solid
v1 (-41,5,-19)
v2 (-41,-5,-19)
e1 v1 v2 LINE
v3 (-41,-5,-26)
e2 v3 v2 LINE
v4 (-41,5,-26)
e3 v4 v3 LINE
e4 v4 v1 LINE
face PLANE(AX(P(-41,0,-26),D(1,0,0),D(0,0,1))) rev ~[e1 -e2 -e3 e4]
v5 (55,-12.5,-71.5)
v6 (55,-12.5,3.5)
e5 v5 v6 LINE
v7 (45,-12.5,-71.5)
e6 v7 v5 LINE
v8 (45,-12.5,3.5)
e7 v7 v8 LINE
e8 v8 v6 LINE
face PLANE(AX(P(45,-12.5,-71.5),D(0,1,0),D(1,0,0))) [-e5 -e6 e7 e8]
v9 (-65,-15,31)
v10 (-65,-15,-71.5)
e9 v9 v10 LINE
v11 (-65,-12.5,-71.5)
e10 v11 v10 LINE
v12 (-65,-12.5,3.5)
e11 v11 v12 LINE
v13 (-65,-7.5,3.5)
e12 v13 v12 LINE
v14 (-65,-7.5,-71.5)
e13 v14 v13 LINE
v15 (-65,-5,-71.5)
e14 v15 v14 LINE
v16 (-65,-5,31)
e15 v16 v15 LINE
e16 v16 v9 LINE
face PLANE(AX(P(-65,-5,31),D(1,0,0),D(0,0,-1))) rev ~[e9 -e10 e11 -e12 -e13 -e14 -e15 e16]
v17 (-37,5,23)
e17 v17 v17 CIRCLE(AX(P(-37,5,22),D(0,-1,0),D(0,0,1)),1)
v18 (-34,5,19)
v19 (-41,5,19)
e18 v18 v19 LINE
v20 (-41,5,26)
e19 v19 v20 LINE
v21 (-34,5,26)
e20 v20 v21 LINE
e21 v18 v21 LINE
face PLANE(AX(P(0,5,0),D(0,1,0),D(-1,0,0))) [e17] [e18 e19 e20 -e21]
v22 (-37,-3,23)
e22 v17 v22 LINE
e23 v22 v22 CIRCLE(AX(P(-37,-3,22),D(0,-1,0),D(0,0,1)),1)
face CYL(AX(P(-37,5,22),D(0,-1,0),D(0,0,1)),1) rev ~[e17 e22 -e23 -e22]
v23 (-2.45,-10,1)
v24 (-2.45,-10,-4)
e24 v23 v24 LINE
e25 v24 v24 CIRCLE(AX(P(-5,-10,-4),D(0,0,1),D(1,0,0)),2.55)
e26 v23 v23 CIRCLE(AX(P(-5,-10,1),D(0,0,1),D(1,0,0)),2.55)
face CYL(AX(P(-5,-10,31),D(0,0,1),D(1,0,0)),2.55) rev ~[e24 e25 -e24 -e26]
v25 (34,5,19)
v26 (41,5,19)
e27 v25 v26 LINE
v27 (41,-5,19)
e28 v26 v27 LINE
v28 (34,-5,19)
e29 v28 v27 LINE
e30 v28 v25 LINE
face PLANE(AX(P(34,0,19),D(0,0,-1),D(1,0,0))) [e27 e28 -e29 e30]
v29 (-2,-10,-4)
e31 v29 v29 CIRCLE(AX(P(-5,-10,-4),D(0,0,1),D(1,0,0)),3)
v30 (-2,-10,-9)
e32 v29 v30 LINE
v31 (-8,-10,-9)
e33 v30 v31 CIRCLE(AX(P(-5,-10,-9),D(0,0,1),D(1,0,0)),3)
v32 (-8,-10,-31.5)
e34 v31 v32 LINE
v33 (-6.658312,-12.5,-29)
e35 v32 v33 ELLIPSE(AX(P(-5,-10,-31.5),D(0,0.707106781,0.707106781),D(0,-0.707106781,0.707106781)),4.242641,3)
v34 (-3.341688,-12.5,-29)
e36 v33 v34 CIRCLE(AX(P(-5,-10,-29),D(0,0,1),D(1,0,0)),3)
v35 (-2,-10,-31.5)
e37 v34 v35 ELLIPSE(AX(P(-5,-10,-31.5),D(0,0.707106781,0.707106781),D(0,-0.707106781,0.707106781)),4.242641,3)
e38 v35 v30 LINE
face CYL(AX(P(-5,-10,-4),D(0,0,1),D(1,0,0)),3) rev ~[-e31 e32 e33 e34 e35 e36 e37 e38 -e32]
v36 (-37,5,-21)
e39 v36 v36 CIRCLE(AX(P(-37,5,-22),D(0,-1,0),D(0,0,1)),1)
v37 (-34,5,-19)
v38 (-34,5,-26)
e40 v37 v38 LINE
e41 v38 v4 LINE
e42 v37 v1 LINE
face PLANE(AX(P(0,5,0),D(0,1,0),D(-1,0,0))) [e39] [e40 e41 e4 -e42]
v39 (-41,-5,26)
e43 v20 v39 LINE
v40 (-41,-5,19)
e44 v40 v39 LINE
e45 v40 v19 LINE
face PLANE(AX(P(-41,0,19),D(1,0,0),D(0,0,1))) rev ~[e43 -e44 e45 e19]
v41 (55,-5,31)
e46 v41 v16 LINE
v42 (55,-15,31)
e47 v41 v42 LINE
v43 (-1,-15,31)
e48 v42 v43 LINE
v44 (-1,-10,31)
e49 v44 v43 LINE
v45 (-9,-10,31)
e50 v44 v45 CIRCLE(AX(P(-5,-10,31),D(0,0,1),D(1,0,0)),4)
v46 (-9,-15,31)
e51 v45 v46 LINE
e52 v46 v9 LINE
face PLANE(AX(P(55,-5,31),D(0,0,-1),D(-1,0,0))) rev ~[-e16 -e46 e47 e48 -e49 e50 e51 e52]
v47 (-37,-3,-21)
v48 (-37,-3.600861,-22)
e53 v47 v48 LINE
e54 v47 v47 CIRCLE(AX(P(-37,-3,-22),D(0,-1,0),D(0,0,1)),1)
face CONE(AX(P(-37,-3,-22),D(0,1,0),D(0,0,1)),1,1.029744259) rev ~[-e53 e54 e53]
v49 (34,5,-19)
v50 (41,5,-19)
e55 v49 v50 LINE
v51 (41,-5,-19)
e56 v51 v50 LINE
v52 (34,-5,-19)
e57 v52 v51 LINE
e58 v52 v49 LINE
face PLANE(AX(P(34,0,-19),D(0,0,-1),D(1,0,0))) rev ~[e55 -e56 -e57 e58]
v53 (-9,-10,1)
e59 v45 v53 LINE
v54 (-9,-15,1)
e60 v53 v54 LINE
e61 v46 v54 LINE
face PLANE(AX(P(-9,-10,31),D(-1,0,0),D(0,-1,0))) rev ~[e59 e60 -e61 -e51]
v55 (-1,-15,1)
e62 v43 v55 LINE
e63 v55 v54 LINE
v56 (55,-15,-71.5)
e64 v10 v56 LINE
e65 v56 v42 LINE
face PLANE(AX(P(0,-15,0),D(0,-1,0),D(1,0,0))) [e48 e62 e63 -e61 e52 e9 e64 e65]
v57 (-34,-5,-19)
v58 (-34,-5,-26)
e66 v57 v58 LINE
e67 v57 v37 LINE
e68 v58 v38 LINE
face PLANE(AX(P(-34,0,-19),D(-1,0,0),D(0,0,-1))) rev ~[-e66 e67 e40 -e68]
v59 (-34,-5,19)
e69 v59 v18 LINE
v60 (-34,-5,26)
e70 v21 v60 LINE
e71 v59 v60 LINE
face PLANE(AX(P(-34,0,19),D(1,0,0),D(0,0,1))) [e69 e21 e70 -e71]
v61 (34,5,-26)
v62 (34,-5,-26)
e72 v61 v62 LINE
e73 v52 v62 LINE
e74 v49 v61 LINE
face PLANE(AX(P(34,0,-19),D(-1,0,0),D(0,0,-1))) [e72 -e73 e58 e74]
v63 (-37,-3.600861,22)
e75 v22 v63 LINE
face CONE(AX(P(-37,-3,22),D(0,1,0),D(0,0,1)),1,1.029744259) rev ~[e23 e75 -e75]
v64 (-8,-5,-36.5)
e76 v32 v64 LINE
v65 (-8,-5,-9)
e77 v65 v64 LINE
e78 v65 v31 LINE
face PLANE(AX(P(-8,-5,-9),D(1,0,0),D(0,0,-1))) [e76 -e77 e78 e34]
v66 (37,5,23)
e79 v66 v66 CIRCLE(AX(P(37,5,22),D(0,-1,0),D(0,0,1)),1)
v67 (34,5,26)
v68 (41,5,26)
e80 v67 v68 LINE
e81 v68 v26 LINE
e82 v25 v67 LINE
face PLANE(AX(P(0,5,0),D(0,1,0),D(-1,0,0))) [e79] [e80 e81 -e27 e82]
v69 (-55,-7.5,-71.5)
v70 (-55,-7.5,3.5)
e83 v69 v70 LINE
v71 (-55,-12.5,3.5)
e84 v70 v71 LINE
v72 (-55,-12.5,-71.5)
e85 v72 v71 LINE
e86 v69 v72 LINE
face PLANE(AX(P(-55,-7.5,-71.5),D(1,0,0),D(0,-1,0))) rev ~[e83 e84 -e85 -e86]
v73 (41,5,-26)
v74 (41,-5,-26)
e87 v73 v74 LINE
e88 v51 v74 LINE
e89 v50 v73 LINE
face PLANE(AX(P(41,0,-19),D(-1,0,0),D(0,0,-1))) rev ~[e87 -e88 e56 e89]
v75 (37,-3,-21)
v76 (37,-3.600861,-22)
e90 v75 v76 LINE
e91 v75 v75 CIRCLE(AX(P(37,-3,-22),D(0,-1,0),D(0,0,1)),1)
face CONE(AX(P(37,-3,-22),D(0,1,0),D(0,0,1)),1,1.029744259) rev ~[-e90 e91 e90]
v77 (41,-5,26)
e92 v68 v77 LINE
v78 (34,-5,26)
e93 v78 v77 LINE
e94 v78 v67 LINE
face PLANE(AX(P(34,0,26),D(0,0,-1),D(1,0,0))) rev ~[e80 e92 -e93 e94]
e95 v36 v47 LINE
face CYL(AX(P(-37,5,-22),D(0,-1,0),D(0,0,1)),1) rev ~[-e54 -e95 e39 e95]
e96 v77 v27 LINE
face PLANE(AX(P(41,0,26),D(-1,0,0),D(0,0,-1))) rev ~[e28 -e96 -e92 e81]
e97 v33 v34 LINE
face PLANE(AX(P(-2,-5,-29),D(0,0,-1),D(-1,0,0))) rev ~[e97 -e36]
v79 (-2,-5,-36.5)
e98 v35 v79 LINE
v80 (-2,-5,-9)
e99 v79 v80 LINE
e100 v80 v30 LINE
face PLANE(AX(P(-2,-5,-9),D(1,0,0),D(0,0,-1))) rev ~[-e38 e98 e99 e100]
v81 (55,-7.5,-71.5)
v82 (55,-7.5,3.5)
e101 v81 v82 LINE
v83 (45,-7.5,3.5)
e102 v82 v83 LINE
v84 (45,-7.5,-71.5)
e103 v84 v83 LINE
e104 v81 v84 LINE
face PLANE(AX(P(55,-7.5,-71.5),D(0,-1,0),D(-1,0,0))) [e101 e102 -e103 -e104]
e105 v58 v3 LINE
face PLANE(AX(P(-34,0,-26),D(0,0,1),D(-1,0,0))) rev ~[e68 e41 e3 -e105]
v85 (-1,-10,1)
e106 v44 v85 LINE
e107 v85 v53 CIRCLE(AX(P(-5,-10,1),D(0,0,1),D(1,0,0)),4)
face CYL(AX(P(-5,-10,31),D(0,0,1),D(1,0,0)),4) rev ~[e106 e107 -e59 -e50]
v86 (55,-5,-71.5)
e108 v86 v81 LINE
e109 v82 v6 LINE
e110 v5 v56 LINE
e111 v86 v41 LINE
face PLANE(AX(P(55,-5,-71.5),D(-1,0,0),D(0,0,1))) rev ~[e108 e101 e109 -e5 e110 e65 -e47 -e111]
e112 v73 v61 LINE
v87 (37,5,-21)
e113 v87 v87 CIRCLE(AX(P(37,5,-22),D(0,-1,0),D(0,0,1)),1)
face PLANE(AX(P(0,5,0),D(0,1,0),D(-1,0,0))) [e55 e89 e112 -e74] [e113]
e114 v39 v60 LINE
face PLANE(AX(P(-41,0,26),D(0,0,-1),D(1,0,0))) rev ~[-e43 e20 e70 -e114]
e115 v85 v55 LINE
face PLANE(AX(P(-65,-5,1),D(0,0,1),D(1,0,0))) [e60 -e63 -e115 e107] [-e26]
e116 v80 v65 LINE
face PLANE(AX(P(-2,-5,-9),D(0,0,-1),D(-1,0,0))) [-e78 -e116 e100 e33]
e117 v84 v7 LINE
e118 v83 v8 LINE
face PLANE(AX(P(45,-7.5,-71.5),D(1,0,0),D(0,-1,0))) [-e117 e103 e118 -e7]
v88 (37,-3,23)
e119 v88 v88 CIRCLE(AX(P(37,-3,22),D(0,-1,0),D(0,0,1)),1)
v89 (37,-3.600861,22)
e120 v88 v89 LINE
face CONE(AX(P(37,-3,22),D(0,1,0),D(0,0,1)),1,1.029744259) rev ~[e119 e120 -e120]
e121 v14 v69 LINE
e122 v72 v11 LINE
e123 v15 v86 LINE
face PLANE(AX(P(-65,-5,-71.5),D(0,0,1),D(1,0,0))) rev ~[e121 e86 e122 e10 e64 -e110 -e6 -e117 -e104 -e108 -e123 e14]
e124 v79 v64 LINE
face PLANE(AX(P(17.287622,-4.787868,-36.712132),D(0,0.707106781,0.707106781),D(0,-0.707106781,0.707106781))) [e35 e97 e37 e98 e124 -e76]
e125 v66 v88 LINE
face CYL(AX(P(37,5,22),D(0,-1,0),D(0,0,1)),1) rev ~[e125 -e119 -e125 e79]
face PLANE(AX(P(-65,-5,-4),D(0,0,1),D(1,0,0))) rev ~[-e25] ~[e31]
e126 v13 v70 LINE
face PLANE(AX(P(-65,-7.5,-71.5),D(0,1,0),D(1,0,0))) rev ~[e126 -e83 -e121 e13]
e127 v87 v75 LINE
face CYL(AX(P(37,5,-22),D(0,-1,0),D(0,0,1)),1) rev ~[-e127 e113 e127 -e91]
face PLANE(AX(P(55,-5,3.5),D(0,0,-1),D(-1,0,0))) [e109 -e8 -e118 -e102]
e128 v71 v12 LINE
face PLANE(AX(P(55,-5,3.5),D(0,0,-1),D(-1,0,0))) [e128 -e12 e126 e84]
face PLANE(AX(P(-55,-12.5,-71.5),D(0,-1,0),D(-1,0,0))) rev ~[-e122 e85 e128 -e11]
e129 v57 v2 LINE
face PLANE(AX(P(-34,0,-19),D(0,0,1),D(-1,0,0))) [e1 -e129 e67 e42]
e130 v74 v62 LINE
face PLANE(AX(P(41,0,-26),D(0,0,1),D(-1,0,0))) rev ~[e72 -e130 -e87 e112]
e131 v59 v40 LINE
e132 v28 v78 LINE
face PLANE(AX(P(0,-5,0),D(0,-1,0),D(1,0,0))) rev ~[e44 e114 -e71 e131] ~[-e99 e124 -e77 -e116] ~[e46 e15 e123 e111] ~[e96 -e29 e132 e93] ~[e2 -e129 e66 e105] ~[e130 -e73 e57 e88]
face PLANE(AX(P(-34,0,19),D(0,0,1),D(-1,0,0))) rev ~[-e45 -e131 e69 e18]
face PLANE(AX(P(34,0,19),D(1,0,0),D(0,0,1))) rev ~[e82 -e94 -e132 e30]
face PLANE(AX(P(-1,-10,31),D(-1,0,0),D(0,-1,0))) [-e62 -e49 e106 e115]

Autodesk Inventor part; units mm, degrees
ref_plane "YZ Plane" through (0, 0, 0) normal (1, 0, 0) x (0, 1, 0)
ref_plane "XZ Plane" through (0, 0, 0) normal (0, 1, 0) x (-1, 0, 0)
ref_plane "XY Plane" through (0, 0, 0) normal (0, 0, 1) x (1, 0, 0)
sketch "Sketch1" plane through (0, 0, 0) normal (0, 1, 0) x (-1, 0, 0)
  line L0 (34, 19) -> (-34, 19)
  line L1 (-34, 19) -> (-34, -19)
  line L2 (-34, -19) -> (34, -19)
  line L3 (34, -19) -> (34, 19)
  line L4 (34, 19) -> (-34, -19) construction
  line L5 (-34, 19) -> (34, -19) construction
  line L6 (41, 26) -> (-41, 26)
  line L7 (-41, 26) -> (-41, -26)
  line L8 (-41, -26) -> (41, -26)
  line L9 (41, -26) -> (41, 26)
  line L10 (41, 26) -> (-41, -26) construction
  line L11 (-41, 26) -> (41, -26) construction
  line L12 (-34, -19) -> (-41, -19)
  line L13 (-34, -19) -> (-34, -26)
  line L14 (-34, 19) -> (-41, 19)
  line L15 (-34, 19) -> (-34, 26)
  line L16 (34, -19) -> (34, -26)
  line L17 (34, -19) -> (41, -19)
  line L18 (34, 19) -> (41, 19)
  line L19 (34, 19) -> (34, 26)
  point P0 (0, 0)
  dimension "d0" = 68
  dimension "d1" = 38
  dimension "d2" = 82
  dimension "d3" = 52
extrude "Extrusion1" add sketch "Sketch1" along normal mid plane 10 contours L19 L6 L9 L18 | L14 L7 L6 L15 | L17 L9 L8 L16 | L13 L8 L7 L12
sketch "Sketch2" plane through (0, -5, 0) normal (0, -1, 0) x (1, 0, 0)
  line L0 (-65, -71.5) -> (55, -71.5)
  line L1 (55, -71.5) -> (55, 31)
  line L2 (55, 31) -> (-65, 31)
  line L3 (-65, 31) -> (-65, -71.5)
  line L4 (-34, 26) -> (-41, 26) projected
  point P0 (0, 0)
  dimension "d6" = 120
  dimension "d7" = 102.5
  dimension "d8" = 5
  dimension "d9" = 55
extrude "Extrusion2" add sketch "Sketch2" along normal blind 10
sketch "Sketch3" plane through (-65, -5, 31) normal (0, 0, 1) x (1, 0, 0)
  circle A0 centre (60, -5) radius 4
  line L0 (120, -10) -> (0, -10) projected
  line L1 (120, 0) -> (120, -10) projected
  circle A1 centre (60, -5) radius 2.55
  circle A2 centre (60, -5) radius 3
  line L2 (56, -5) -> (56, -10)
  line L3 (64, -5) -> (64, -10)
  line L4 (56, -10) -> (64, -10)
  point P0 (65, 5)
  point P1 (60, -10)
  dimension "d13" = 8
  dimension "d14" = 5
  dimension "d16" = 5.1
  dimension "d17" = 6
extrude "Extrusion3" cut sketch "Sketch3" against normal blind 30 contours A0 | L3 L0 L2 A0 | A1 | A2
extrude "Extrusion4" cut sketch "Sketch3" against normal blind 60 contours A1
ref_plane "Work Plane2" through (-65, -5, -4) normal (0, 0, 1) x (1, 0, 0)
sketch "Sketch5" plane through (-65, -5, -4) normal (0, 0, 1) x (1, 0, 0)
  circle A0 centre (60, -5) radius 3 projected
  point P0 (65, 5)
extrude "Extrusion5" cut sketch "Sketch5" against normal up to surface (25 mm away)
sketch "Sketch6" plane through (0, -5, 0) normal (0, 1, 0) x (1, 0, 0)
  line L0 (-2, 4) -> (-2, 29) projected
  line L1 (-2, 29) -> (-8, 29) projected
  line L2 (-8, 4) -> (-8, 29) projected
  line L3 (-2, 9) -> (-8, 9)
  point P0 (0, 0)
  dimension "d25" = 20
extrude "Extrusion6" cut sketch "Sketch6" against normal blind 5
fillet "Fillet1" [suppressed]
chamfer "Chamfer1" distance 7.5 angle 45 1 edges at (-5, -5, -29)
sketch "Sketch7" plane through (0, 5, 0) normal (0, 1, 0) x (1, 0, 0)
  circle A0 centre (37, 22) radius 1.6 projected
  circle A1 centre (37, -22) radius 1.6 projected
  circle A2 centre (-37, -22) radius 1.6 projected
  point P0 (0, 0)
  point P1 (-37, 22)
hole "Hole1" at (37, 5, -22) at (37, 5, 22) at (-37, 5, 22) at (-37, 5, -22) direction (0, -1, 0) diameter 2 depth 8 tip angle 118
sketch "Sketch8" plane through (0, -5, 0) normal (0, 1, 0) x (1, 0, 0)
  line L0 (-65, -31) -> (-55, -31)
  line L1 (-55, -31) -> (-55, -8)
  line L2 (-55, -8) -> (-65, -8)
  line L3 (-65, -8) -> (-65, -31)
  line L4 (-65, -31) -> (-65, 71.5) projected
  line L5 (-65, 71.5) -> (-55, 71.5)
  line L6 (-55, 71.5) -> (-55, 48.5)
  line L7 (-55, 48.5) -> (-65, 48.5)
  line L8 (-65, 48.5) -> (-65, 71.5)
  line L9 (55, -31) -> (-65, -31) projected
  line L10 (55, -31) -> (45, -31)
  line L11 (45, -31) -> (45, -8)
  line L12 (45, -8) -> (55, -8)
  line L13 (55, -8) -> (55, -31)
  point P0 (0, 0)
  dimension "d39" = 10
  dimension "d40" = 23
  dimension "d41" = 10
  dimension "d42" = 23
  dimension "d43" = 10
  dimension "d44" = 23
sketch "Sketch9" plane through (55, -5, -71.5) normal (0, 0, -1) x (-1, 0, 0)
  line L0 (120, 0) -> (120, -10) projected
  line L1 (120, -2.5) -> (110, -2.5)
  line L2 (110, -2.5) -> (110, -7.5)
  line L3 (110, -7.5) -> (120, -7.5)
  line L4 (120, -7.5) -> (120, -2.5)
  line L5 (0, 0) -> (0, -10) projected
  line L6 (0, -2.5) -> (10, -2.5)
  line L7 (10, -2.5) -> (10, -7.5)
  line L8 (10, -7.5) -> (0, -7.5)
  line L9 (0, -7.5) -> (0, -2.5)
  point P0 (55, 5)
  point P1 (110, -5)
  point P2 (120, -5)
  point P3 (10, -5)
  point P4 (0, -5)
  point P5 (0, -7.5)
  dimension "d45" = 5
  dimension "d46" = 10
  dimension "d47" = 10
  dimension "d48" = 5
extrude "Extrusion7" cut sketch "Sketch9" against normal blind 75
delete_face "Delete Face1" [suppressed]
properties part number "PCB_Housing_01_V3"
